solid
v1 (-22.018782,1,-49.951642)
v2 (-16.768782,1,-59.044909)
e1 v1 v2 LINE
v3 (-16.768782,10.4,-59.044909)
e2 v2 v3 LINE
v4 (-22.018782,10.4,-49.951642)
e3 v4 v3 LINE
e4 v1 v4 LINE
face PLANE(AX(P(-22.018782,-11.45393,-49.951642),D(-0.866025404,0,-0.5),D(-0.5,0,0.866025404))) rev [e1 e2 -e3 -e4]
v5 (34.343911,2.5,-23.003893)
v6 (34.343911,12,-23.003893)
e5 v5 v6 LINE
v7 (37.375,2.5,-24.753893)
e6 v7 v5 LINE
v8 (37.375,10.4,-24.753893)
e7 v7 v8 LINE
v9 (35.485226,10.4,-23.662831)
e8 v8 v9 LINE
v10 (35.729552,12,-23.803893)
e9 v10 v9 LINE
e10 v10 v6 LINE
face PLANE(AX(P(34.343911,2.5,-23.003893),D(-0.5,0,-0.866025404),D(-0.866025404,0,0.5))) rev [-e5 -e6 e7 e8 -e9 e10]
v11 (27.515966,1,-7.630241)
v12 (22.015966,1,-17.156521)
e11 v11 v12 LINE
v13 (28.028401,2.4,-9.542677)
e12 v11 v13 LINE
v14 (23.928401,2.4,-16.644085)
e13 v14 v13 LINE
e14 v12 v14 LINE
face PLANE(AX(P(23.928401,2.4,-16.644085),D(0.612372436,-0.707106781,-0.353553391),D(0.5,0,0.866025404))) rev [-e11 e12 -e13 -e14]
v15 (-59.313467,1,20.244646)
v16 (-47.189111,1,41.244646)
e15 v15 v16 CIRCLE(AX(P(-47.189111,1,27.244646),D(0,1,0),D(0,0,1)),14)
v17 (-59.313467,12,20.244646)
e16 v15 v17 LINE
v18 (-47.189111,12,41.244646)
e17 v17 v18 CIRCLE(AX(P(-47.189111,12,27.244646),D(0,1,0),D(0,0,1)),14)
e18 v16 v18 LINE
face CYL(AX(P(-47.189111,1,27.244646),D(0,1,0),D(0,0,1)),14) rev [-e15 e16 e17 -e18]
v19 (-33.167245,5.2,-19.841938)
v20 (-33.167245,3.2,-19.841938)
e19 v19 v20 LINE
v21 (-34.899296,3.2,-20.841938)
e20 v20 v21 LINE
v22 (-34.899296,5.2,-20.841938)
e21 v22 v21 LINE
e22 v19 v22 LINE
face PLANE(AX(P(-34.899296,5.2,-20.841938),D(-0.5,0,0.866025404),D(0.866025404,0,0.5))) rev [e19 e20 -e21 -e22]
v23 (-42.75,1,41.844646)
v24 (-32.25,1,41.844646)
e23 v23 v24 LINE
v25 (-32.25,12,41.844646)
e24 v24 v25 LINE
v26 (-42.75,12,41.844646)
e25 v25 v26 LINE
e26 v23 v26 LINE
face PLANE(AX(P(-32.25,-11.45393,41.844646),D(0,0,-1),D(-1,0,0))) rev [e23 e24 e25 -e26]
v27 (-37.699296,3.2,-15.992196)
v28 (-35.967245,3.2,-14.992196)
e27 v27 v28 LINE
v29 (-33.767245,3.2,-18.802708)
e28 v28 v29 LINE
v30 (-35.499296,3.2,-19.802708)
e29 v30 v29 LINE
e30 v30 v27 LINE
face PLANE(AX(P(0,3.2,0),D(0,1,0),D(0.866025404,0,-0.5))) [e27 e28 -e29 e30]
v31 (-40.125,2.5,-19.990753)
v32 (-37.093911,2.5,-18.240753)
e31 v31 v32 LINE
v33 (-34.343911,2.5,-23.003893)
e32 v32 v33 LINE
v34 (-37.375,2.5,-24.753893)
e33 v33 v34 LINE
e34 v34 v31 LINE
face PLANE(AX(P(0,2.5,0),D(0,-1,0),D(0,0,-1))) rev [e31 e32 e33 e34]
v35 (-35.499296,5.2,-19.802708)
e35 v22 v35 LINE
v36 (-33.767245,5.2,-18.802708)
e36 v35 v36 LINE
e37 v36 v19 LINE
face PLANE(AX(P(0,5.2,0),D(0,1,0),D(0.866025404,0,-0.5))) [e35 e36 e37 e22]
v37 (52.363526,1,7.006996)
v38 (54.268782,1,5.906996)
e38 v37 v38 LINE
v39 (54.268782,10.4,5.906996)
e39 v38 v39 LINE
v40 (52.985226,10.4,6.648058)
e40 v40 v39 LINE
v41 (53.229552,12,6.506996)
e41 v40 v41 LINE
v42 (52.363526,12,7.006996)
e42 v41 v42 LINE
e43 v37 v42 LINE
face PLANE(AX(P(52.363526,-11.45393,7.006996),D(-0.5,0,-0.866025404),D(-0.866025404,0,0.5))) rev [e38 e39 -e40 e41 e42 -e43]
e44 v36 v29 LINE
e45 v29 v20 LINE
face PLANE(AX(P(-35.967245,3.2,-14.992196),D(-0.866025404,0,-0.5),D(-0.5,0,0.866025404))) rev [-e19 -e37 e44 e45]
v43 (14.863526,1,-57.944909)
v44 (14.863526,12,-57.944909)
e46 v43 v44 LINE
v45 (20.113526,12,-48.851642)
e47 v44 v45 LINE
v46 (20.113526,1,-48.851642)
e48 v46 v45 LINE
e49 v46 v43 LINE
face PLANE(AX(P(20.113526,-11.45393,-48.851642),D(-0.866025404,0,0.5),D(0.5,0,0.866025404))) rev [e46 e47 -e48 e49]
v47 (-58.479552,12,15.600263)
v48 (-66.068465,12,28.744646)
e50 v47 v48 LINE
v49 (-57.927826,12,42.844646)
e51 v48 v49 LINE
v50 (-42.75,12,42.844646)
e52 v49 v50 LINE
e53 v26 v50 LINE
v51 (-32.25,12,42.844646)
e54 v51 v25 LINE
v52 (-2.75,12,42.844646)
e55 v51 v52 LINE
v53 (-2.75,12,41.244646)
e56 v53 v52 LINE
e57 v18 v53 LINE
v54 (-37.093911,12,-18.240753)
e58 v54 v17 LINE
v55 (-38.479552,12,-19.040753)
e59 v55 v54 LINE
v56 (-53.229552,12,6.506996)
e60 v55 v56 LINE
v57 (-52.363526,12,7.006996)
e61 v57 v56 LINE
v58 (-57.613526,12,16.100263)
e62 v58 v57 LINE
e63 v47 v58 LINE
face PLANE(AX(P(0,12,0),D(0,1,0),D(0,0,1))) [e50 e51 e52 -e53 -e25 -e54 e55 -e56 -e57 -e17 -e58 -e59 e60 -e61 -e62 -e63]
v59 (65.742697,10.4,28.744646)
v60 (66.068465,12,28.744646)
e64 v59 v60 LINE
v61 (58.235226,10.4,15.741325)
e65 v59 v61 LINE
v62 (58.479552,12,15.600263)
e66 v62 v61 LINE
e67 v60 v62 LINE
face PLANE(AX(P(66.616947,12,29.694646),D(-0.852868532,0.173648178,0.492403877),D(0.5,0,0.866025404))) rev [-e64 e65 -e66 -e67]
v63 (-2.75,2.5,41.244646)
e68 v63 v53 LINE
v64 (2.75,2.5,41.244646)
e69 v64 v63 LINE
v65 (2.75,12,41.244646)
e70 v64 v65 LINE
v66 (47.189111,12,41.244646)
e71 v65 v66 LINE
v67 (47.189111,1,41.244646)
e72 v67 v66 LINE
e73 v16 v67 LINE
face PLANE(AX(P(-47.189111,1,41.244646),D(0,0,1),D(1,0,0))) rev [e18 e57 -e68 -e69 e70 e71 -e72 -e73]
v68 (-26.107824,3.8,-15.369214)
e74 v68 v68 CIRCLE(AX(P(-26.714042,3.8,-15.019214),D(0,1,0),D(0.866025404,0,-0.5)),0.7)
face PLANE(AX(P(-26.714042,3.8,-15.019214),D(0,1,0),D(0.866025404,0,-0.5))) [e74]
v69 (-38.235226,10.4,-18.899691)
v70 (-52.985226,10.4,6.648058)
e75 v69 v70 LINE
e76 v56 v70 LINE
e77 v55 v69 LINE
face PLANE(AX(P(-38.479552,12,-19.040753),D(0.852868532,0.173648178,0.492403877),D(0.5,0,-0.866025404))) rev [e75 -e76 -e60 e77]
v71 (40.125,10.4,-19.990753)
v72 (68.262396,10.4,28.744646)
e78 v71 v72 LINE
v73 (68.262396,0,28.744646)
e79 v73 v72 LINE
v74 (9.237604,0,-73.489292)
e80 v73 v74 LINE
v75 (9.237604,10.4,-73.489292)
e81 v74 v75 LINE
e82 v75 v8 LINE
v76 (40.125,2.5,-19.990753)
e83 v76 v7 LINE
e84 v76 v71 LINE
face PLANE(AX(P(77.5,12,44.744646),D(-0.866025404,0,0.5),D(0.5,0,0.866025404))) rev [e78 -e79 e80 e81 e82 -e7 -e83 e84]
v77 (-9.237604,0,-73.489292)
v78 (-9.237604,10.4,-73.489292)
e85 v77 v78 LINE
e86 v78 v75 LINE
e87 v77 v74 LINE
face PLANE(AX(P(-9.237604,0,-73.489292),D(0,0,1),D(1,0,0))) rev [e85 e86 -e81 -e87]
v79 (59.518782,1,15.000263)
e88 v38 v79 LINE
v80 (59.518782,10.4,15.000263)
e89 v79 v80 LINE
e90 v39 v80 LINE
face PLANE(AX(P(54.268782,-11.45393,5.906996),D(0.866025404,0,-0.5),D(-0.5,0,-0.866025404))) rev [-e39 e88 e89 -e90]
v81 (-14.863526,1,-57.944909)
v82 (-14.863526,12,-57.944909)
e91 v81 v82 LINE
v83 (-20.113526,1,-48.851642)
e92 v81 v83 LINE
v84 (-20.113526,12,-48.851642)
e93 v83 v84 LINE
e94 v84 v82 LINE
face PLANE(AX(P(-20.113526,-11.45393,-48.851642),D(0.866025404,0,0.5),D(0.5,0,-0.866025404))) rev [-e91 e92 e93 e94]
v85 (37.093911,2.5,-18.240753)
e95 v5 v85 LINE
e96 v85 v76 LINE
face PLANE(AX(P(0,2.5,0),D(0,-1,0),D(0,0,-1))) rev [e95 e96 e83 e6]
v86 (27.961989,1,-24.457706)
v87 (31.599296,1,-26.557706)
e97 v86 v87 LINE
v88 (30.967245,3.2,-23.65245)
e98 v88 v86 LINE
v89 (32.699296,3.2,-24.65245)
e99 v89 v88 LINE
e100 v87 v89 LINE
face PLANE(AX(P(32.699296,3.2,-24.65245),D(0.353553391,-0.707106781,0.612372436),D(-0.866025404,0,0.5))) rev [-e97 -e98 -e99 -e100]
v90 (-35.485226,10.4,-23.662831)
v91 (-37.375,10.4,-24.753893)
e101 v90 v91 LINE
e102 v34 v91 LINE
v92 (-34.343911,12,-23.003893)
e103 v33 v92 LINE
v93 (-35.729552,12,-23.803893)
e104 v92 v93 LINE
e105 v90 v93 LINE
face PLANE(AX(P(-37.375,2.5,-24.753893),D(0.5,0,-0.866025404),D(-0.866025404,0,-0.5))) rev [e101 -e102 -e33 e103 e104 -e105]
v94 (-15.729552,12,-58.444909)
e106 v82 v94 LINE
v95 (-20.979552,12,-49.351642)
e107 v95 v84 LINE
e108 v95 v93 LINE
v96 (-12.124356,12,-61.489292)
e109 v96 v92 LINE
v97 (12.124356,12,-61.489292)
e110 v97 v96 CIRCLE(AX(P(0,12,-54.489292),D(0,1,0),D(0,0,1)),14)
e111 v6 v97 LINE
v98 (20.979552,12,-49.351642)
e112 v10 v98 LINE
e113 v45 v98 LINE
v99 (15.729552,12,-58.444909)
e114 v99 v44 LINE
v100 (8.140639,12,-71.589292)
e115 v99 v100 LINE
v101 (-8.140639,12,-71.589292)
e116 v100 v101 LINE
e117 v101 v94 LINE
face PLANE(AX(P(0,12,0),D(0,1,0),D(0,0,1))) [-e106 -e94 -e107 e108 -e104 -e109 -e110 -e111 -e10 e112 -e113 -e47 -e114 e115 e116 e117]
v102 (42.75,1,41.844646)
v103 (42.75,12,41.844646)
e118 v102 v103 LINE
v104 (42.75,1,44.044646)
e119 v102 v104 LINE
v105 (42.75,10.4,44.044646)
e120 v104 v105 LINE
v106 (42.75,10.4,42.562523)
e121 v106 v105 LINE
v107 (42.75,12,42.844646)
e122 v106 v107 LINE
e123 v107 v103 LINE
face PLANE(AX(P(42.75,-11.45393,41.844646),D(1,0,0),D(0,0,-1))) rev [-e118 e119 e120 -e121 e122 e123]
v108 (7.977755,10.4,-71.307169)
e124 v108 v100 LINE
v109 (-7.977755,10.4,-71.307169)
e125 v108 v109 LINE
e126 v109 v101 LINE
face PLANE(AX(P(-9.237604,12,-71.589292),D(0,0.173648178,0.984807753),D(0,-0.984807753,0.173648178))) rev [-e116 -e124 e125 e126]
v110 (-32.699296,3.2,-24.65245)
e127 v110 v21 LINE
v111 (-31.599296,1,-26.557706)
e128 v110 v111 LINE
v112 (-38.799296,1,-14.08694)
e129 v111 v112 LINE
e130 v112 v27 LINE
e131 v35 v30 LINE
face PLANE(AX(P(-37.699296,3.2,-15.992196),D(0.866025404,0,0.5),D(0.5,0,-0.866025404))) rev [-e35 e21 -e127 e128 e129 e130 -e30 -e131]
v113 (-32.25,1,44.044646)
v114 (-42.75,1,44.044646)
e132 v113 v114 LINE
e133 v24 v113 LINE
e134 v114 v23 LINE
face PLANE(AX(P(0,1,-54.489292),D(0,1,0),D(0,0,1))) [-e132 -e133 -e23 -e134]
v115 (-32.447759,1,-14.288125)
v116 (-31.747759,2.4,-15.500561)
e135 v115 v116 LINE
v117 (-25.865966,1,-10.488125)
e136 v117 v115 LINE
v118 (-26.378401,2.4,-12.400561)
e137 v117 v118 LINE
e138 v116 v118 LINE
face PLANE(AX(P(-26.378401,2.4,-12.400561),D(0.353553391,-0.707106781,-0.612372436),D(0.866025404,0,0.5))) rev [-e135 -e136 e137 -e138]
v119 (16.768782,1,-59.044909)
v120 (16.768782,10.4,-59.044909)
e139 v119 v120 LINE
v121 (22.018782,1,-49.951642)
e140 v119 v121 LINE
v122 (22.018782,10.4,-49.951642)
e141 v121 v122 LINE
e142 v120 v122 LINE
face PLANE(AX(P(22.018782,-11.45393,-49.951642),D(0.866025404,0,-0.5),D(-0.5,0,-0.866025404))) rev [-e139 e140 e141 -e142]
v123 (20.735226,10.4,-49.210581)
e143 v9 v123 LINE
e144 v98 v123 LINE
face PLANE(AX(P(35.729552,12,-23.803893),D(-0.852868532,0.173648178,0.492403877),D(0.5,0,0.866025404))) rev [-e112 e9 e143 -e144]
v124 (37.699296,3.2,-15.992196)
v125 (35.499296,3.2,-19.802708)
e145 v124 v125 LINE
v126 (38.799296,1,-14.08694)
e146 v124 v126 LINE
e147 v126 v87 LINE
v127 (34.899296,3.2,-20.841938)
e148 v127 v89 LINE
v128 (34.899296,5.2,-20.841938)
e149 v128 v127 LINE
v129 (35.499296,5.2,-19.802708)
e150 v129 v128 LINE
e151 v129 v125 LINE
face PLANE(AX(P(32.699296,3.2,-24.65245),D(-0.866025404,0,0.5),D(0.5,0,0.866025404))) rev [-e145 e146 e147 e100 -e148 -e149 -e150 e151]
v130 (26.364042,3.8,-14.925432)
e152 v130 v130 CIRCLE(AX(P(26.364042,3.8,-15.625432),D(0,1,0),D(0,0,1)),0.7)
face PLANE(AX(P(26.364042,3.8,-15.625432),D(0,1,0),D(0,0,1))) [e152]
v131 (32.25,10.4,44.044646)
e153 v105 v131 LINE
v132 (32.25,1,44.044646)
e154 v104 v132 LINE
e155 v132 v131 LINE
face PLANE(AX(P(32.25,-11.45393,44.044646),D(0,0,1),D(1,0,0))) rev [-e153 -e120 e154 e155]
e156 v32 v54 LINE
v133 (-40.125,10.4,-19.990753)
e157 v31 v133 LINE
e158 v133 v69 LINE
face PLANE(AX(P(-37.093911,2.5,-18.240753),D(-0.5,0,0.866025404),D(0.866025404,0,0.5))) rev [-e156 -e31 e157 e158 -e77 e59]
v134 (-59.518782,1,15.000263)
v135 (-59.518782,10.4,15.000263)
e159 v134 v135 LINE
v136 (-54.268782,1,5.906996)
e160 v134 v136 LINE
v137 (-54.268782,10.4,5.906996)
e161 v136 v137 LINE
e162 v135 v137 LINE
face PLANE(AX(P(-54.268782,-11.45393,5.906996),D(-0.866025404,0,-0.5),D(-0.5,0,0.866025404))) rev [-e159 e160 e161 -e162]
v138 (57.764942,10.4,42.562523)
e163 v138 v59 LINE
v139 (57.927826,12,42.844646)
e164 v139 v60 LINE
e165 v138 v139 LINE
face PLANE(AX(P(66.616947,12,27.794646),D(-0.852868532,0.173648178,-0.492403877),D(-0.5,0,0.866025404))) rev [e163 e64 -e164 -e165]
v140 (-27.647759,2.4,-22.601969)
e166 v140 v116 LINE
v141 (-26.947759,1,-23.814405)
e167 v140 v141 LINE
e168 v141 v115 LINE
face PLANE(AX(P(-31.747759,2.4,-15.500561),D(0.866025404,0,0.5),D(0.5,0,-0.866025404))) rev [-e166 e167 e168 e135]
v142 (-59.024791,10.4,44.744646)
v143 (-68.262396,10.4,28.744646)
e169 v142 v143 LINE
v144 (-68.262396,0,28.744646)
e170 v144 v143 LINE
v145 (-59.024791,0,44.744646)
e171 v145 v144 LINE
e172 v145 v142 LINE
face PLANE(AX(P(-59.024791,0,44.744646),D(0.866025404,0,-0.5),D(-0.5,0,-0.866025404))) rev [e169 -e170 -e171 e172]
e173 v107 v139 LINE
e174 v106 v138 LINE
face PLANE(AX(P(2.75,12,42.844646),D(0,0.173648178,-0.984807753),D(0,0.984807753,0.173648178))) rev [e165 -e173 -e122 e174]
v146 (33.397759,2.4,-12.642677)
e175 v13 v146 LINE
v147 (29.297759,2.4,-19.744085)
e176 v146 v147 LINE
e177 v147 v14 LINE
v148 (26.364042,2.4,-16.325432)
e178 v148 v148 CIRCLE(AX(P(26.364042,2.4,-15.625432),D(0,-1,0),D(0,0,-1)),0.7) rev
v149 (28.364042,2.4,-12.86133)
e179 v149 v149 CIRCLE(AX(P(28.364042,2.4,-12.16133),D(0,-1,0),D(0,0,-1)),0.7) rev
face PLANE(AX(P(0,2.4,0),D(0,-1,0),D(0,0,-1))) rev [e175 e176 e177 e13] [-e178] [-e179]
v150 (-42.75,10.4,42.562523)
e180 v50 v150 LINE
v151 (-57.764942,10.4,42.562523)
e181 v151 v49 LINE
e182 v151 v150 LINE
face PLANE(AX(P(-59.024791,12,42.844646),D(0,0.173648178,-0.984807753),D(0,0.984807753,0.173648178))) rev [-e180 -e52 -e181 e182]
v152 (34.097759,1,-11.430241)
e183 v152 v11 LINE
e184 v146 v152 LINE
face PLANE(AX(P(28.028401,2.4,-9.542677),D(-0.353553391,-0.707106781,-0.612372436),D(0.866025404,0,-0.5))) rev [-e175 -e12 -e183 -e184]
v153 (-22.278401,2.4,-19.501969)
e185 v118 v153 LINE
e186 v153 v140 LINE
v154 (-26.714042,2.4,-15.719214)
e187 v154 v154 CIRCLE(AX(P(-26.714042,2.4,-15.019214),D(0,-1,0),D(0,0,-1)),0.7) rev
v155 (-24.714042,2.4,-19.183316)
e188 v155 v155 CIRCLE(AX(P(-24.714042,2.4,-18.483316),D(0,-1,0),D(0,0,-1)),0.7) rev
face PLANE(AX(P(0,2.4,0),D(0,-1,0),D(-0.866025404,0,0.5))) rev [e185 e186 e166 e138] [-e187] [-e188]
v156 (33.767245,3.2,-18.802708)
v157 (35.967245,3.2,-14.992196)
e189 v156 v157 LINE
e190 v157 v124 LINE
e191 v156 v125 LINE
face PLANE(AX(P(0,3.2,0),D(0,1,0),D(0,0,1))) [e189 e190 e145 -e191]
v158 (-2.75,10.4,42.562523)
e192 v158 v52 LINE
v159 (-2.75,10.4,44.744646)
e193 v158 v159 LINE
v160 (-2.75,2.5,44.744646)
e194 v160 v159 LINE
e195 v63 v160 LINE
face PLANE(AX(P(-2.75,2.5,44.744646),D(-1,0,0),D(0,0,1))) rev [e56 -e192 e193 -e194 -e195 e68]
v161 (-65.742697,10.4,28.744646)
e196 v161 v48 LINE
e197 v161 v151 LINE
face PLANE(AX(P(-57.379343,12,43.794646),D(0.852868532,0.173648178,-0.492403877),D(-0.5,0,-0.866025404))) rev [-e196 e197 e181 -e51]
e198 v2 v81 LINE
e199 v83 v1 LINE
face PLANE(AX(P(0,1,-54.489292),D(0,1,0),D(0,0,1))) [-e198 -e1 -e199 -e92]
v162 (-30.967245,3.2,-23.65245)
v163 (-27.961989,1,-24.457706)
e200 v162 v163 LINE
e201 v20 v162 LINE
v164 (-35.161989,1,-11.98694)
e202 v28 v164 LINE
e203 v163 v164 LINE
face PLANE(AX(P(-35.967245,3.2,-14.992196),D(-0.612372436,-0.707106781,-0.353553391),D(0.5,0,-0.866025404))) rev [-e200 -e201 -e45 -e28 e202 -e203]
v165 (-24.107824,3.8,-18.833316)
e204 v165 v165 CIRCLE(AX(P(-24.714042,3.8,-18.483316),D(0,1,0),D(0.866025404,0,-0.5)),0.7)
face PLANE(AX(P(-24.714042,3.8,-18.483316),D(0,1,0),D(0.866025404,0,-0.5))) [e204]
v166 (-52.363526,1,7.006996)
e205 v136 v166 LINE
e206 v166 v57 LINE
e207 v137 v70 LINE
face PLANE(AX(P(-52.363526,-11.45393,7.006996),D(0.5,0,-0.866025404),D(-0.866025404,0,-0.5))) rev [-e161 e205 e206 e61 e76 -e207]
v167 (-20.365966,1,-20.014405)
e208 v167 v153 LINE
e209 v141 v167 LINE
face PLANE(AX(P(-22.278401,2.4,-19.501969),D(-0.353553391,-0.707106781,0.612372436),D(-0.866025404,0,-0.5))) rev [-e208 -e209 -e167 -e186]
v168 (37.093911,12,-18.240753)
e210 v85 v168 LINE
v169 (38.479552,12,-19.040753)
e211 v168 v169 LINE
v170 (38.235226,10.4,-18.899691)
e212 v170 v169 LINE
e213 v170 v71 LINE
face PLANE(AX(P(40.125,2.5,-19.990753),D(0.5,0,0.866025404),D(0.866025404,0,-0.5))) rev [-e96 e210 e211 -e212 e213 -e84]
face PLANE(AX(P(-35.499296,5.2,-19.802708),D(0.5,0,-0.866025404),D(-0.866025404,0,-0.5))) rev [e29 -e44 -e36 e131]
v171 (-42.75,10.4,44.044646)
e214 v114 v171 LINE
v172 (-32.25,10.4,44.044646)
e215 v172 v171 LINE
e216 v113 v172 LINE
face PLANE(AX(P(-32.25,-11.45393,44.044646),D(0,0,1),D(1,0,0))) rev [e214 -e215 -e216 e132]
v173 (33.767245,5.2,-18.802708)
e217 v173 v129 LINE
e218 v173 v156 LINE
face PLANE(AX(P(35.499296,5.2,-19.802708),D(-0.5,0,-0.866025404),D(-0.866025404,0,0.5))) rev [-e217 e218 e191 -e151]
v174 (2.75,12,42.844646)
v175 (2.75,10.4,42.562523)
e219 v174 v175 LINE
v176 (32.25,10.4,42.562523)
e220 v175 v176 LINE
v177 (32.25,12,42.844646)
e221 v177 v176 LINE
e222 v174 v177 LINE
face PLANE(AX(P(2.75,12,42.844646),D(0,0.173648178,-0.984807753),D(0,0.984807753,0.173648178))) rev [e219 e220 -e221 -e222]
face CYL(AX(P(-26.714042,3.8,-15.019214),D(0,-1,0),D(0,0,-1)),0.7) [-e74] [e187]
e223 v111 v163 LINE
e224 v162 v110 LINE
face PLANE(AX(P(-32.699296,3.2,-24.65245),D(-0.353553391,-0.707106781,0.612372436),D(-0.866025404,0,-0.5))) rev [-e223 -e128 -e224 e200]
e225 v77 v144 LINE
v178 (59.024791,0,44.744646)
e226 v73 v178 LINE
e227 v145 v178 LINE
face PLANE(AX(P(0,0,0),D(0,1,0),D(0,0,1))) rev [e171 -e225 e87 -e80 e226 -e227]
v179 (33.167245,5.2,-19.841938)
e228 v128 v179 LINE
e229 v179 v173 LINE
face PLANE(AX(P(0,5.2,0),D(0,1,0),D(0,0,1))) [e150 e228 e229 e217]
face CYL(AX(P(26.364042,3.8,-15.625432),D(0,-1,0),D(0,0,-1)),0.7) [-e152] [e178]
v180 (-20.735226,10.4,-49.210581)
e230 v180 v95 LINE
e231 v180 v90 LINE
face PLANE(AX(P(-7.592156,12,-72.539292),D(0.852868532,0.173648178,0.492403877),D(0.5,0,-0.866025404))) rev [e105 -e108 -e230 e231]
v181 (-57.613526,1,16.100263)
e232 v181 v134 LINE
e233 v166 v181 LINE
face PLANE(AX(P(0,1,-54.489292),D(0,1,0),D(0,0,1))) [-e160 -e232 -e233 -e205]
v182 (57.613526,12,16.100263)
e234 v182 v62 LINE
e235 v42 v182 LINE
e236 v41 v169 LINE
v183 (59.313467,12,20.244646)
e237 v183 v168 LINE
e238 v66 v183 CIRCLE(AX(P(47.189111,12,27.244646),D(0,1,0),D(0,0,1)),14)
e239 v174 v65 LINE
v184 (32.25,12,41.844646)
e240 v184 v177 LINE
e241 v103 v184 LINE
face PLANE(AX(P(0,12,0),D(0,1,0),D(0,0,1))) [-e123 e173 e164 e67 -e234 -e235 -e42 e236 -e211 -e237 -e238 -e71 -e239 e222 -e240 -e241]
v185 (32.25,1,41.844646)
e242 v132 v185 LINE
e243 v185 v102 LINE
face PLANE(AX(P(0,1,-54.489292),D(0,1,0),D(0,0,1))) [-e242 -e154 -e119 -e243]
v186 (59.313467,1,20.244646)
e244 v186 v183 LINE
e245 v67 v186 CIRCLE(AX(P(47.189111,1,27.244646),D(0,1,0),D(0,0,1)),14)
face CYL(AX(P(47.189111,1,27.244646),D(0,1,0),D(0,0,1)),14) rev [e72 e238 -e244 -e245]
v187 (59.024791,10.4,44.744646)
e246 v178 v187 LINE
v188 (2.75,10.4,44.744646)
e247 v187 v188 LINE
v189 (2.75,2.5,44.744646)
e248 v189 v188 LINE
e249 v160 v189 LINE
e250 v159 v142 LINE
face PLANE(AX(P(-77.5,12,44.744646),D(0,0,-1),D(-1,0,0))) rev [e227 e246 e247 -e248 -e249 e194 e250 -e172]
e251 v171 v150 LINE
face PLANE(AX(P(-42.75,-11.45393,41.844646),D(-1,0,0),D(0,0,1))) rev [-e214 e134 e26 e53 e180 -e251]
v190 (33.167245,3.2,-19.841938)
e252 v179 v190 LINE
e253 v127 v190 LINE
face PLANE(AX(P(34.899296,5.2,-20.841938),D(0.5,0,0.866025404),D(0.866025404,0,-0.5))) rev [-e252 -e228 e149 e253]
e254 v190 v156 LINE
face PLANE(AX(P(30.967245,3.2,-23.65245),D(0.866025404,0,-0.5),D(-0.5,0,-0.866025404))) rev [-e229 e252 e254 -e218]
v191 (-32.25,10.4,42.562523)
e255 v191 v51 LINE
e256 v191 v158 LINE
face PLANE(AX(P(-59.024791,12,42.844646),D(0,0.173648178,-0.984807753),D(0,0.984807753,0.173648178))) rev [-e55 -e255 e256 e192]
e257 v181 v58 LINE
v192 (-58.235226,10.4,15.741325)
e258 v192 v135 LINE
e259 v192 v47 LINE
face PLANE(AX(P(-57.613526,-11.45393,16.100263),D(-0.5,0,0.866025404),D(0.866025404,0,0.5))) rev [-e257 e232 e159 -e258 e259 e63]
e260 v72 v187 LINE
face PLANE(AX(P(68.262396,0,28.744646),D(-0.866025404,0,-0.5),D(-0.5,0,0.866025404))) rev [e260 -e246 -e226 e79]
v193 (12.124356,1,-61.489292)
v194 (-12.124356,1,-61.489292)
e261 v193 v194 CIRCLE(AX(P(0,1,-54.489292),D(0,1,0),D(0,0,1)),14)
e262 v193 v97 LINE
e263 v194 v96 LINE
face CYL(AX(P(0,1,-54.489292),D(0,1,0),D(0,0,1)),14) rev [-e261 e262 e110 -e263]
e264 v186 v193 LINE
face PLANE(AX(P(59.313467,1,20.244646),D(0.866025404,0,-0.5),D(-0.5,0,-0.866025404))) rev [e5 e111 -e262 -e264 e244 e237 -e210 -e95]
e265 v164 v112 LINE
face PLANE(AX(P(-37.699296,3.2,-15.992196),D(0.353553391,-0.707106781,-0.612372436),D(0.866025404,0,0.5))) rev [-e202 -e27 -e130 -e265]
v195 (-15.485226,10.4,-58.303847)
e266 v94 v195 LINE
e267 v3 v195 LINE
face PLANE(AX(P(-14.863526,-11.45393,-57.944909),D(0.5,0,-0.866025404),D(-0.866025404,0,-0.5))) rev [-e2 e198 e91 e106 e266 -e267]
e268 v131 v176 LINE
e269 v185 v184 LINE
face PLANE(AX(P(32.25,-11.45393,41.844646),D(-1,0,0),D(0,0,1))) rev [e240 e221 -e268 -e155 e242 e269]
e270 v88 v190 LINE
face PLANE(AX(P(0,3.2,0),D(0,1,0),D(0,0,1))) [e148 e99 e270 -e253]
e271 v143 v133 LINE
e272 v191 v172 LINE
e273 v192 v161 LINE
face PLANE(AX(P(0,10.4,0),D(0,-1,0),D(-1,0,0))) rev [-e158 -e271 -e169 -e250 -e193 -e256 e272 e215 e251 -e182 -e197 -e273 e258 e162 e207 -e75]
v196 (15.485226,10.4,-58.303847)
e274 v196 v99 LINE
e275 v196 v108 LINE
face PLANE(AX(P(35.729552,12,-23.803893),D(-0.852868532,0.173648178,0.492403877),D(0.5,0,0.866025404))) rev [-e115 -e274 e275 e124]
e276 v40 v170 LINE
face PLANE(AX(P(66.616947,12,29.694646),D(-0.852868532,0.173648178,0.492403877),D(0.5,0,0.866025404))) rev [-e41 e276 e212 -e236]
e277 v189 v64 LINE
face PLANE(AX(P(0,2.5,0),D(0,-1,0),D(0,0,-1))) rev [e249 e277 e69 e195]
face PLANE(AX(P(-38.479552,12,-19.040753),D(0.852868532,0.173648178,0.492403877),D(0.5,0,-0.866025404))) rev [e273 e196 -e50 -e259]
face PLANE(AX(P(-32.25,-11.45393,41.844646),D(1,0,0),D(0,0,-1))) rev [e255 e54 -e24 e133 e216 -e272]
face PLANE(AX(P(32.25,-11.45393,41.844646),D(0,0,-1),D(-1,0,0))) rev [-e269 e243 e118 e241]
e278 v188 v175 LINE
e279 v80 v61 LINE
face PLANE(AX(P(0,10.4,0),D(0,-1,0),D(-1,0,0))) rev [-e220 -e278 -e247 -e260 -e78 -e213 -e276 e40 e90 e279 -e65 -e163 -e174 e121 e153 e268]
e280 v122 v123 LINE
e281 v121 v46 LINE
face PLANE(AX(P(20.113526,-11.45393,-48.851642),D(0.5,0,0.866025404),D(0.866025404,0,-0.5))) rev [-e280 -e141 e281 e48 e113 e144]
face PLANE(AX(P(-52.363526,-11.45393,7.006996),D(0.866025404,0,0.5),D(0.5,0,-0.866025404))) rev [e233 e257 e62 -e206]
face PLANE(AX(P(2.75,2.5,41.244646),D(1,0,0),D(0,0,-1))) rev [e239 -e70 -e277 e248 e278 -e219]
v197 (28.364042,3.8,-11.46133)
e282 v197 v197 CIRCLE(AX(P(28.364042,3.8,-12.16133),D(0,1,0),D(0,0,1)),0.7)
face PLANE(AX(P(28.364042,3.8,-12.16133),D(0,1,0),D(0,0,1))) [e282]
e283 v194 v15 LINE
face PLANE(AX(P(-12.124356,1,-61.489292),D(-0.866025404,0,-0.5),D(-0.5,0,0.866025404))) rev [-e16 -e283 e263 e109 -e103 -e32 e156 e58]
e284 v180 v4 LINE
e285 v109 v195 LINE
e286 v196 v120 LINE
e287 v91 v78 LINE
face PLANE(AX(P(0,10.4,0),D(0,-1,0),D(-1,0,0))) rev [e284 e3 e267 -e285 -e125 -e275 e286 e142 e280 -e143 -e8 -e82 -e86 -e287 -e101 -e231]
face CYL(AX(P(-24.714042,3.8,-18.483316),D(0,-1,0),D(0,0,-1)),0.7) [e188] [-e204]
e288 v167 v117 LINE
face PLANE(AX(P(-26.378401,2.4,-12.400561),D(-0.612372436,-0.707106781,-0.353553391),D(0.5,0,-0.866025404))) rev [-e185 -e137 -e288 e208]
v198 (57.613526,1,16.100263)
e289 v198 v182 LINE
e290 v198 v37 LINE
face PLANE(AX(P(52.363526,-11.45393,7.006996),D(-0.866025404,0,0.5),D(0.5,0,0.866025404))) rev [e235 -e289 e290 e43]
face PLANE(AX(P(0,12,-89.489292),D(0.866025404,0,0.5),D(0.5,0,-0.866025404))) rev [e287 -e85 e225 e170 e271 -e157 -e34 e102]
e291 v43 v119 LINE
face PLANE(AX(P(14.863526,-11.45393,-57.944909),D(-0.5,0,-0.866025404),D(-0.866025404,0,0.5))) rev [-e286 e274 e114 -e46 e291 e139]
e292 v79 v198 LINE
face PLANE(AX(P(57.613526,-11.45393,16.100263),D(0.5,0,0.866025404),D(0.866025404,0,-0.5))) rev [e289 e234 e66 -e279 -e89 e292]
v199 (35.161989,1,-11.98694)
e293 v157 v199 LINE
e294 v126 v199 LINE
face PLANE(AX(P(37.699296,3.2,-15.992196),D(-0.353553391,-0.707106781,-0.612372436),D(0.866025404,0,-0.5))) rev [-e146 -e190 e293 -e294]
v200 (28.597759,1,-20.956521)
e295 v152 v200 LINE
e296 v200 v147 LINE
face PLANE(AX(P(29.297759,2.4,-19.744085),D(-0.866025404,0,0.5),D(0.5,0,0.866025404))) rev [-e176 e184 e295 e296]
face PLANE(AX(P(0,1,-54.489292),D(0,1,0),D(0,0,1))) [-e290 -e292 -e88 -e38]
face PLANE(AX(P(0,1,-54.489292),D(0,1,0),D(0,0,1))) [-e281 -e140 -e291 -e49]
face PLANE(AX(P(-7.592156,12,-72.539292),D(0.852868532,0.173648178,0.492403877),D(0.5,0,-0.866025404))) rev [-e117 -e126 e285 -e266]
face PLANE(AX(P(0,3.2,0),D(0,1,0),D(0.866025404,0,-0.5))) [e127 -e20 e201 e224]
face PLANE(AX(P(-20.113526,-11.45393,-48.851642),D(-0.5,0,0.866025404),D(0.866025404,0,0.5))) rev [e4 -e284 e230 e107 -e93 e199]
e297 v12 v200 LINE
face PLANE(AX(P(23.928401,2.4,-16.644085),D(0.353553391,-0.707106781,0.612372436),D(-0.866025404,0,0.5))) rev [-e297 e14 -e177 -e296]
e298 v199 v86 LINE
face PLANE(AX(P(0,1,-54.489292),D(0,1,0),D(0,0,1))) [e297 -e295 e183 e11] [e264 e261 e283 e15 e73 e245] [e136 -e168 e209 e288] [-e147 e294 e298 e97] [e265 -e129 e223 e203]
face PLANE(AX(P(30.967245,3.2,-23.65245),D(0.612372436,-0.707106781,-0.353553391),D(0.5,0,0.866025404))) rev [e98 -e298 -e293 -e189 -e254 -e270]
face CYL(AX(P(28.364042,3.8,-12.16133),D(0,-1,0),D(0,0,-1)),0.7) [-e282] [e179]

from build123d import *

# Parameters (mm, degrees)
BOSS_EXTRU_1_DEPTH                        = 12
ENL_V_MAT_EXTRU_1_DEPTH                   = 119.989845505
ENL_V_MAT_EXTRU_2_DEPTH                   = 11
ESQUISSE4_W                               = 5.5
ESQUISSE4_H                               = 3.5
ENL_V_MAT_EXTRU_3_DEPTH                   = 9.5
BOSS_EXTRU_2_DEPTH                        = 1.4
ESQUISSE13_R                              = 0.7
BOSS_EXTRU_3_DEPTH                        = 1.4
BOSS_EXTRU_6_DEPTH                        = 2.2
BOSS_EXTRU_7_DEPTH                        = 2
CHANFREIN3_SIZE                           = 2.2
CHANFREIN4_SIZE                           = 1.4
R_P_TITION_CIRCULAIRE2_COUNT              = 2
R_P_TITION_CIRCULAIRE2_ANGLE              = 120
CHANFREIN3_OF_R_P_TITION_CIRCULAIRE2_SIZE = 2.2
CHANFREIN4_OF_R_P_TITION_CIRCULAIRE2_SIZE = 1.4
ENL_V_DE_MAT_EXTRU_MINCE1_DEPTH           = 1.6
ENL_V_DE_MAT_EXTRU_MINCE1_DRAFT           = 10
ENL_V_DE_MAT_EXTRU_MINCE1_PROFILE_2_DEPTH = 1.6
ENL_V_DE_MAT_EXTRU_MINCE1_PROFILE_2_DRAFT = 10
ENL_V_DE_MAT_EXTRU_MINCE1_PROFILE_3_DEPTH = 1.6
ENL_V_DE_MAT_EXTRU_MINCE1_PROFILE_3_DRAFT = 10
ESQUISSE18_W                              = 10.5
ESQUISSE18_H                              = 2.2
ENL_V_MAT_EXTRU_10_DEPTH                  = 11


with BuildPart() as part:
    # Esquisse1 → Boss.-Extru.1 (new body)
    with BuildSketch(Plane(origin=(0, 0, 0), x_dir=(1, 0, 0), z_dir=(0, 1, 0))):
        Polygon((-77.5, -44.744645862), (77.5, -44.744645862), (0, 89.489291724), align=None)
    extrude(amount=BOSS_EXTRU_1_DEPTH)

    # Esquisse2 → Enlèv. mat.-Extru.1 (cut, through all)
    with BuildSketch(Plane(origin=(0, 12, 0), x_dir=(1, 0, 0), z_dir=(0, 1, 0))):
        Polygon((-9.237604307, 73.489291724), (9.237604307, 73.489291724), (0, 89.489291724), align=None)
        Polygon((77.5, -44.744645862), (68.262395693, -28.744645862), (59.024791386, -44.744645862), align=None)
        Polygon((-77.5, -44.744645862), (-59.024791386, -44.744645862), (-68.262395693, -28.744645862), align=None)
    extrude(amount=-ENL_V_MAT_EXTRU_1_DEPTH, mode=Mode.SUBTRACT)

    # Esquisse3 → Enlèv. mat.-Extru.2 (cut)
    with BuildSketch(Plane(origin=(0, 12, 0), x_dir=(1, 0, 0), z_dir=(0, 1, 0))):
        with BuildLine():
            Line((59.313466521, -20.244645862), (12.124355653, 61.489291724))
            ThreePointArc((12.124355653, 61.489291724), (0, 68.489291724), (-12.124355653, 61.489291724))
            Line((-12.124355653, 61.489291724), (-59.313466521, -20.244645862))
            ThreePointArc((-59.313466521, -20.244645862), (-59.313466521, -34.244645862), (-47.189110868, -41.244645862))
            Line((-47.189110868, -41.244645862), (47.189110868, -41.244645862))
            ThreePointArc((47.189110868, -41.244645862), (59.313466521, -34.244645862), (59.313466521, -20.244645862))
        make_face()
    extrude(amount=-ENL_V_MAT_EXTRU_2_DEPTH, mode=Mode.SUBTRACT)

    # Esquisse4 → Enlèv. mat.-Extru.3 (cut)
    with BuildSketch(Plane(origin=(0, 12, 0), x_dir=(1, 0, 0), z_dir=(0, 1, 0))):
        Polygon((37.093911087, 18.240753071), (34.343911087, 23.003892792), (37.375, 24.753892792), (40.125, 19.990753071), align=None)
        with Locations((0, -42.994645862)):
            Rectangle(ESQUISSE4_W, ESQUISSE4_H)
        Polygon((-37.375, 24.753892792), (-34.343911087, 23.003892792), (-37.093911087, 18.240753071), (-40.125, 19.990753071), align=None)
    extrude(amount=-ENL_V_MAT_EXTRU_3_DEPTH, mode=Mode.SUBTRACT)

    # Esquisse12 → Boss.-Extru.2 (add)
    with BuildSketch(Plane(origin=(0, 1, 0), x_dir=(1, 0, 0), z_dir=(0, 1, 0))):
        Polygon((23.928401161, 16.64408517), (28.028401161, 9.542676859), (33.397758664, 12.642676859), (29.297758664, 19.74408517), align=None)
    boss_extru_2 = extrude(amount=BOSS_EXTRU_2_DEPTH)

    # Esquisse13 → Boss.-Extru.3 (add)
    with BuildSketch(Plane(origin=(0, 2.4, 0), x_dir=(1, 0, 0), z_dir=(0, 1, 0))):
        with Locations(Location((26.364041807, 15.625431822, 0), (0, 0, 90))):
            Circle(ESQUISSE13_R)
        with Locations(Location((28.364041807, 12.161330207, 0), (0, 0, 90))):
            Circle(ESQUISSE13_R)
    boss_extru_3 = extrude(amount=BOSS_EXTRU_3_DEPTH)

    # Esquisse14 → Boss.-Extru.6 (add)
    with BuildSketch(Plane(origin=(0, 1, 0), x_dir=(1, 0, 0), z_dir=(0, 1, 0))):
        Polygon((32.699295844, 24.65244995), (37.699295844, 15.992195912), (35.967245037, 14.992195912), (30.967245037, 23.65244995), align=None)
    boss_extru_6 = extrude(amount=BOSS_EXTRU_6_DEPTH)

    # Esquisse15 → Boss.-Extru.7 (add)
    with BuildSketch(Plane(origin=(0, 3.2, 0), x_dir=(1, 0, 0), z_dir=(0, 1, 0))):
        Polygon((34.899295844, 20.841938173), (35.499295844, 19.802707689), (33.767245037, 18.802707689), (33.167245037, 19.841938173), align=None)
    boss_extru_7 = extrude(amount=BOSS_EXTRU_7_DEPTH)

    # Chanfrein3
    chanfrein3_edges = [part.edges().sort_by_distance(p)[0] for p in [
        (33.467245037, 1, -19.322322931),
        (36.833270441, 1, -15.492195912),
        (31.833270441, 1, -24.15244995),
    ]]
    chamfer(chanfrein3_edges, length=CHANFREIN3_SIZE - 0.0001)  # a hair under: the kernel refuses the full size

    # Chanfrein4
    chanfrein4_edges = [part.edges().sort_by_distance(p)[0] for p in [
        (26.613079912, 1, -18.19408517),
        (25.978401161, 1, -13.093381015),
        (30.713079912, 1, -11.092676859),
    ]]
    chamfer(chanfrein4_edges, length=CHANFREIN4_SIZE - 0.0001)  # a hair under: the kernel refuses the full size

    # Répétition circulaire2: Boss.-Extru.2, Boss.-Extru.3, Boss.-Extru.6, Boss.-Extru.7 ×2 about axis
    r_p_tition_circulaire2_axis = Axis((0, 0, 0), (0, 1, 0))
    add([boss_extru_2.rotate(r_p_tition_circulaire2_axis, i * R_P_TITION_CIRCULAIRE2_ANGLE / (R_P_TITION_CIRCULAIRE2_COUNT - 1)) for i in range(1, R_P_TITION_CIRCULAIRE2_COUNT)])
    add([boss_extru_3.rotate(r_p_tition_circulaire2_axis, i * R_P_TITION_CIRCULAIRE2_ANGLE / (R_P_TITION_CIRCULAIRE2_COUNT - 1)) for i in range(1, R_P_TITION_CIRCULAIRE2_COUNT)])
    add([boss_extru_6.rotate(r_p_tition_circulaire2_axis, i * R_P_TITION_CIRCULAIRE2_ANGLE / (R_P_TITION_CIRCULAIRE2_COUNT - 1)) for i in range(1, R_P_TITION_CIRCULAIRE2_COUNT)])
    add([boss_extru_7.rotate(r_p_tition_circulaire2_axis, i * R_P_TITION_CIRCULAIRE2_ANGLE / (R_P_TITION_CIRCULAIRE2_COUNT - 1)) for i in range(1, R_P_TITION_CIRCULAIRE2_COUNT)])

    # Chanfrein3 of Répétition circulaire2
    chanfrein3_of_r_p_tition_circulaire2_edges = [part.edges().sort_by_distance(p)[0] for p in [
        (-33.467245037, 1, -19.322322931),
        (-31.833270441, 1, -24.15244995),
        (-36.833270441, 1, -15.492195912),
    ]]
    chamfer(chanfrein3_of_r_p_tition_circulaire2_edges, length=CHANFREIN3_OF_R_P_TITION_CIRCULAIRE2_SIZE - 0.0001)  # a hair under: the kernel refuses the full size

    # Chanfrein4 of Répétition circulaire2
    chanfrein4_of_r_p_tition_circulaire2_edges = [part.edges().sort_by_distance(p)[0] for p in [
        (-29.063079912, 1, -13.950560692),
        (-24.328401161, 1, -15.951264847),
        (-24.963079912, 1, -21.051969003),
    ]]
    chamfer(chanfrein4_of_r_p_tition_circulaire2_edges, length=CHANFREIN4_OF_R_P_TITION_CIRCULAIRE2_SIZE - 0.0001)  # a hair under: the kernel refuses the full size


with BuildPart() as enl_v_de_mat_extru_mince1_tool:
    # Esquisse17 → Enlèv. de mat.-Extru.-Mince1 (with draft: the straight prism first)
    with BuildSketch(Plane(origin=(0, 12, 0), x_dir=(1, 0, 0), z_dir=(0, 1, 0))):
        Polygon((37.375, 24.753892792), (9.237604307, 73.489291724), (-9.237604307, 73.489291724), (-37.375, 24.753892792), (-35.729551733, 23.803892792), (-8.140638796, 71.589291724), (8.140638796, 71.589291724), (35.729551733, 23.803892792), align=None)
    extrude(amount=-ENL_V_DE_MAT_EXTRU_MINCE1_DEPTH)
    # Enlèv. de mat.-Extru.-Mince1: the draft: its side faces are tilted about the plane it starts from
    enl_v_de_mat_extru_mince1_sides = [enl_v_de_mat_extru_mince1_tool.faces().sort_by_distance(p)[0] for p in [
        (23.306302154, 11.2, -49.121592258),
        (0, 11.2, -73.489291724),
        (-23.306302154, 11.2, -49.121592258),
        (-36.552275866, 11.2, -24.278892792),
        (-21.935095264, 11.2, -47.696592258),
        (0, 11.2, -71.589291724),
        (21.935095264, 11.2, -47.696592258),
        (36.552275866, 11.2, -24.278892792),
    ]]
    draft(enl_v_de_mat_extru_mince1_sides, Plane(origin=(0, 12, 0), x_dir=(1, 0, 0), z_dir=(0, 1, 0)), ENL_V_DE_MAT_EXTRU_MINCE1_DRAFT)


with BuildPart() as part_1:
    add(part.part)

    # Enlèv. de mat.-Extru.-Mince1: cut by enl_v_de_mat_extru_mince1_tool
    add(enl_v_de_mat_extru_mince1_tool.part, mode=Mode.SUBTRACT)


with BuildPart() as enl_v_de_mat_extru_mince1_profile_2_tool:
    # Esquisse17 → Enlèv. de mat.-Extru.-Mince1 profile 2 (with draft: the straight prism first)
    with BuildSketch(Plane(origin=(0, 12, 0), x_dir=(1, 0, 0), z_dir=(0, 1, 0))):
        Polygon((-40.125, 19.990753071), (-68.262395693, -28.744645862), (-59.024791386, -44.744645862), (-2.75, -44.744645862), (-2.75, -42.844645862), (-57.927825874, -42.844645862), (-66.06846467, -28.744645862), (-38.479551733, 19.040753071), align=None)
    extrude(amount=-ENL_V_DE_MAT_EXTRU_MINCE1_PROFILE_2_DEPTH)
    # Enlèv. de mat.-Extru.-Mince1 profile 2: the draft: its side faces are tilted about the plane it starts from
    enl_v_de_mat_extru_mince1_profile_2_sides = [enl_v_de_mat_extru_mince1_profile_2_tool.faces().sort_by_distance(p)[0] for p in [
        (-54.193697846, 11.2, 4.376946396),
        (-63.643593539, 11.2, 36.744645862),
        (-30.887395693, 11.2, 44.744645862),
        (-2.75, 11.2, 43.794645862),
        (-30.338912937, 11.2, 42.844645862),
        (-61.998145272, 11.2, 35.794645862),
        (-52.274008201, 11.2, 4.851946396),
        (-39.302275866, 11.2, -19.515753071),
    ]]
    draft(enl_v_de_mat_extru_mince1_profile_2_sides, Plane(origin=(0, 12, 0), x_dir=(1, 0, 0), z_dir=(0, 1, 0)), ENL_V_DE_MAT_EXTRU_MINCE1_PROFILE_2_DRAFT)


with BuildPart() as part_2:
    add(part_1.part)

    # Enlèv. de mat.-Extru.-Mince1 profile 2: cut by enl_v_de_mat_extru_mince1_profile_2_tool
    add(enl_v_de_mat_extru_mince1_profile_2_tool.part, mode=Mode.SUBTRACT)


with BuildPart() as enl_v_de_mat_extru_mince1_profile_3_tool:
    # Esquisse17 → Enlèv. de mat.-Extru.-Mince1 profile 3 (with draft: the straight prism first)
    with BuildSketch(Plane(origin=(0, 12, 0), x_dir=(1, 0, 0), z_dir=(0, 1, 0))):
        Polygon((2.75, -44.744645862), (59.024791386, -44.744645862), (68.262395693, -28.744645862), (40.125, 19.990753071), (38.479551733, 19.040753071), (66.06846467, -28.744645862), (57.927825874, -42.844645862), (2.75, -42.844645862), align=None)
    extrude(amount=-ENL_V_DE_MAT_EXTRU_MINCE1_PROFILE_3_DEPTH)
    # Enlèv. de mat.-Extru.-Mince1 profile 3: the draft: its side faces are tilted about the plane it starts from
    enl_v_de_mat_extru_mince1_profile_3_sides = [enl_v_de_mat_extru_mince1_profile_3_tool.faces().sort_by_distance(p)[0] for p in [
        (30.887395693, 11.2, 44.744645862),
        (63.643593539, 11.2, 36.744645862),
        (54.193697846, 11.2, 4.376946396),
        (39.302275866, 11.2, -19.515753071),
        (52.274008201, 11.2, 4.851946396),
        (61.998145272, 11.2, 35.794645862),
        (30.338912937, 11.2, 42.844645862),
        (2.75, 11.2, 43.794645862),
    ]]
    draft(enl_v_de_mat_extru_mince1_profile_3_sides, Plane(origin=(0, 12, 0), x_dir=(1, 0, 0), z_dir=(0, 1, 0)), ENL_V_DE_MAT_EXTRU_MINCE1_PROFILE_3_DRAFT)


with BuildPart() as part_3:
    add(part_2.part)

    # Enlèv. de mat.-Extru.-Mince1 profile 3: cut by enl_v_de_mat_extru_mince1_profile_3_tool
    add(enl_v_de_mat_extru_mince1_profile_3_tool.part, mode=Mode.SUBTRACT)

    # Esquisse18 → Enlèv. mat.-Extru.10 (cut)
    with BuildSketch(Plane(origin=(0, 12, 0), x_dir=(1, 0, 0), z_dir=(0, 1, 0))):
        with Locations((37.5, -42.944645862)):
            Rectangle(ESQUISSE18_W, ESQUISSE18_H)
        with Locations((-37.5, -42.944645862)):
            Rectangle(ESQUISSE18_W, ESQUISSE18_H)
        Polygon((-52.363526329, -7.006996341), (-57.613526329, -16.100263081), (-59.518782217, -15.000263081), (-54.268782217, -5.906996341), align=None)
        Polygon((-20.113526329, 48.851642203), (-22.018782217, 49.951642203), (-16.768782217, 59.044908943), (-14.863526329, 57.944908943), align=None)
        Polygon((20.113526329, 48.851642203), (14.863526329, 57.944908943), (16.768782217, 59.044908943), (22.018782217, 49.951642203), align=None)
        Polygon((52.363526329, -7.006996341), (54.268782217, -5.906996341), (59.518782217, -15.000263081), (57.613526329, -16.100263081), align=None)
    extrude(amount=-ENL_V_MAT_EXTRU_10_DEPTH, mode=Mode.SUBTRACT)


solid = part_3.part
